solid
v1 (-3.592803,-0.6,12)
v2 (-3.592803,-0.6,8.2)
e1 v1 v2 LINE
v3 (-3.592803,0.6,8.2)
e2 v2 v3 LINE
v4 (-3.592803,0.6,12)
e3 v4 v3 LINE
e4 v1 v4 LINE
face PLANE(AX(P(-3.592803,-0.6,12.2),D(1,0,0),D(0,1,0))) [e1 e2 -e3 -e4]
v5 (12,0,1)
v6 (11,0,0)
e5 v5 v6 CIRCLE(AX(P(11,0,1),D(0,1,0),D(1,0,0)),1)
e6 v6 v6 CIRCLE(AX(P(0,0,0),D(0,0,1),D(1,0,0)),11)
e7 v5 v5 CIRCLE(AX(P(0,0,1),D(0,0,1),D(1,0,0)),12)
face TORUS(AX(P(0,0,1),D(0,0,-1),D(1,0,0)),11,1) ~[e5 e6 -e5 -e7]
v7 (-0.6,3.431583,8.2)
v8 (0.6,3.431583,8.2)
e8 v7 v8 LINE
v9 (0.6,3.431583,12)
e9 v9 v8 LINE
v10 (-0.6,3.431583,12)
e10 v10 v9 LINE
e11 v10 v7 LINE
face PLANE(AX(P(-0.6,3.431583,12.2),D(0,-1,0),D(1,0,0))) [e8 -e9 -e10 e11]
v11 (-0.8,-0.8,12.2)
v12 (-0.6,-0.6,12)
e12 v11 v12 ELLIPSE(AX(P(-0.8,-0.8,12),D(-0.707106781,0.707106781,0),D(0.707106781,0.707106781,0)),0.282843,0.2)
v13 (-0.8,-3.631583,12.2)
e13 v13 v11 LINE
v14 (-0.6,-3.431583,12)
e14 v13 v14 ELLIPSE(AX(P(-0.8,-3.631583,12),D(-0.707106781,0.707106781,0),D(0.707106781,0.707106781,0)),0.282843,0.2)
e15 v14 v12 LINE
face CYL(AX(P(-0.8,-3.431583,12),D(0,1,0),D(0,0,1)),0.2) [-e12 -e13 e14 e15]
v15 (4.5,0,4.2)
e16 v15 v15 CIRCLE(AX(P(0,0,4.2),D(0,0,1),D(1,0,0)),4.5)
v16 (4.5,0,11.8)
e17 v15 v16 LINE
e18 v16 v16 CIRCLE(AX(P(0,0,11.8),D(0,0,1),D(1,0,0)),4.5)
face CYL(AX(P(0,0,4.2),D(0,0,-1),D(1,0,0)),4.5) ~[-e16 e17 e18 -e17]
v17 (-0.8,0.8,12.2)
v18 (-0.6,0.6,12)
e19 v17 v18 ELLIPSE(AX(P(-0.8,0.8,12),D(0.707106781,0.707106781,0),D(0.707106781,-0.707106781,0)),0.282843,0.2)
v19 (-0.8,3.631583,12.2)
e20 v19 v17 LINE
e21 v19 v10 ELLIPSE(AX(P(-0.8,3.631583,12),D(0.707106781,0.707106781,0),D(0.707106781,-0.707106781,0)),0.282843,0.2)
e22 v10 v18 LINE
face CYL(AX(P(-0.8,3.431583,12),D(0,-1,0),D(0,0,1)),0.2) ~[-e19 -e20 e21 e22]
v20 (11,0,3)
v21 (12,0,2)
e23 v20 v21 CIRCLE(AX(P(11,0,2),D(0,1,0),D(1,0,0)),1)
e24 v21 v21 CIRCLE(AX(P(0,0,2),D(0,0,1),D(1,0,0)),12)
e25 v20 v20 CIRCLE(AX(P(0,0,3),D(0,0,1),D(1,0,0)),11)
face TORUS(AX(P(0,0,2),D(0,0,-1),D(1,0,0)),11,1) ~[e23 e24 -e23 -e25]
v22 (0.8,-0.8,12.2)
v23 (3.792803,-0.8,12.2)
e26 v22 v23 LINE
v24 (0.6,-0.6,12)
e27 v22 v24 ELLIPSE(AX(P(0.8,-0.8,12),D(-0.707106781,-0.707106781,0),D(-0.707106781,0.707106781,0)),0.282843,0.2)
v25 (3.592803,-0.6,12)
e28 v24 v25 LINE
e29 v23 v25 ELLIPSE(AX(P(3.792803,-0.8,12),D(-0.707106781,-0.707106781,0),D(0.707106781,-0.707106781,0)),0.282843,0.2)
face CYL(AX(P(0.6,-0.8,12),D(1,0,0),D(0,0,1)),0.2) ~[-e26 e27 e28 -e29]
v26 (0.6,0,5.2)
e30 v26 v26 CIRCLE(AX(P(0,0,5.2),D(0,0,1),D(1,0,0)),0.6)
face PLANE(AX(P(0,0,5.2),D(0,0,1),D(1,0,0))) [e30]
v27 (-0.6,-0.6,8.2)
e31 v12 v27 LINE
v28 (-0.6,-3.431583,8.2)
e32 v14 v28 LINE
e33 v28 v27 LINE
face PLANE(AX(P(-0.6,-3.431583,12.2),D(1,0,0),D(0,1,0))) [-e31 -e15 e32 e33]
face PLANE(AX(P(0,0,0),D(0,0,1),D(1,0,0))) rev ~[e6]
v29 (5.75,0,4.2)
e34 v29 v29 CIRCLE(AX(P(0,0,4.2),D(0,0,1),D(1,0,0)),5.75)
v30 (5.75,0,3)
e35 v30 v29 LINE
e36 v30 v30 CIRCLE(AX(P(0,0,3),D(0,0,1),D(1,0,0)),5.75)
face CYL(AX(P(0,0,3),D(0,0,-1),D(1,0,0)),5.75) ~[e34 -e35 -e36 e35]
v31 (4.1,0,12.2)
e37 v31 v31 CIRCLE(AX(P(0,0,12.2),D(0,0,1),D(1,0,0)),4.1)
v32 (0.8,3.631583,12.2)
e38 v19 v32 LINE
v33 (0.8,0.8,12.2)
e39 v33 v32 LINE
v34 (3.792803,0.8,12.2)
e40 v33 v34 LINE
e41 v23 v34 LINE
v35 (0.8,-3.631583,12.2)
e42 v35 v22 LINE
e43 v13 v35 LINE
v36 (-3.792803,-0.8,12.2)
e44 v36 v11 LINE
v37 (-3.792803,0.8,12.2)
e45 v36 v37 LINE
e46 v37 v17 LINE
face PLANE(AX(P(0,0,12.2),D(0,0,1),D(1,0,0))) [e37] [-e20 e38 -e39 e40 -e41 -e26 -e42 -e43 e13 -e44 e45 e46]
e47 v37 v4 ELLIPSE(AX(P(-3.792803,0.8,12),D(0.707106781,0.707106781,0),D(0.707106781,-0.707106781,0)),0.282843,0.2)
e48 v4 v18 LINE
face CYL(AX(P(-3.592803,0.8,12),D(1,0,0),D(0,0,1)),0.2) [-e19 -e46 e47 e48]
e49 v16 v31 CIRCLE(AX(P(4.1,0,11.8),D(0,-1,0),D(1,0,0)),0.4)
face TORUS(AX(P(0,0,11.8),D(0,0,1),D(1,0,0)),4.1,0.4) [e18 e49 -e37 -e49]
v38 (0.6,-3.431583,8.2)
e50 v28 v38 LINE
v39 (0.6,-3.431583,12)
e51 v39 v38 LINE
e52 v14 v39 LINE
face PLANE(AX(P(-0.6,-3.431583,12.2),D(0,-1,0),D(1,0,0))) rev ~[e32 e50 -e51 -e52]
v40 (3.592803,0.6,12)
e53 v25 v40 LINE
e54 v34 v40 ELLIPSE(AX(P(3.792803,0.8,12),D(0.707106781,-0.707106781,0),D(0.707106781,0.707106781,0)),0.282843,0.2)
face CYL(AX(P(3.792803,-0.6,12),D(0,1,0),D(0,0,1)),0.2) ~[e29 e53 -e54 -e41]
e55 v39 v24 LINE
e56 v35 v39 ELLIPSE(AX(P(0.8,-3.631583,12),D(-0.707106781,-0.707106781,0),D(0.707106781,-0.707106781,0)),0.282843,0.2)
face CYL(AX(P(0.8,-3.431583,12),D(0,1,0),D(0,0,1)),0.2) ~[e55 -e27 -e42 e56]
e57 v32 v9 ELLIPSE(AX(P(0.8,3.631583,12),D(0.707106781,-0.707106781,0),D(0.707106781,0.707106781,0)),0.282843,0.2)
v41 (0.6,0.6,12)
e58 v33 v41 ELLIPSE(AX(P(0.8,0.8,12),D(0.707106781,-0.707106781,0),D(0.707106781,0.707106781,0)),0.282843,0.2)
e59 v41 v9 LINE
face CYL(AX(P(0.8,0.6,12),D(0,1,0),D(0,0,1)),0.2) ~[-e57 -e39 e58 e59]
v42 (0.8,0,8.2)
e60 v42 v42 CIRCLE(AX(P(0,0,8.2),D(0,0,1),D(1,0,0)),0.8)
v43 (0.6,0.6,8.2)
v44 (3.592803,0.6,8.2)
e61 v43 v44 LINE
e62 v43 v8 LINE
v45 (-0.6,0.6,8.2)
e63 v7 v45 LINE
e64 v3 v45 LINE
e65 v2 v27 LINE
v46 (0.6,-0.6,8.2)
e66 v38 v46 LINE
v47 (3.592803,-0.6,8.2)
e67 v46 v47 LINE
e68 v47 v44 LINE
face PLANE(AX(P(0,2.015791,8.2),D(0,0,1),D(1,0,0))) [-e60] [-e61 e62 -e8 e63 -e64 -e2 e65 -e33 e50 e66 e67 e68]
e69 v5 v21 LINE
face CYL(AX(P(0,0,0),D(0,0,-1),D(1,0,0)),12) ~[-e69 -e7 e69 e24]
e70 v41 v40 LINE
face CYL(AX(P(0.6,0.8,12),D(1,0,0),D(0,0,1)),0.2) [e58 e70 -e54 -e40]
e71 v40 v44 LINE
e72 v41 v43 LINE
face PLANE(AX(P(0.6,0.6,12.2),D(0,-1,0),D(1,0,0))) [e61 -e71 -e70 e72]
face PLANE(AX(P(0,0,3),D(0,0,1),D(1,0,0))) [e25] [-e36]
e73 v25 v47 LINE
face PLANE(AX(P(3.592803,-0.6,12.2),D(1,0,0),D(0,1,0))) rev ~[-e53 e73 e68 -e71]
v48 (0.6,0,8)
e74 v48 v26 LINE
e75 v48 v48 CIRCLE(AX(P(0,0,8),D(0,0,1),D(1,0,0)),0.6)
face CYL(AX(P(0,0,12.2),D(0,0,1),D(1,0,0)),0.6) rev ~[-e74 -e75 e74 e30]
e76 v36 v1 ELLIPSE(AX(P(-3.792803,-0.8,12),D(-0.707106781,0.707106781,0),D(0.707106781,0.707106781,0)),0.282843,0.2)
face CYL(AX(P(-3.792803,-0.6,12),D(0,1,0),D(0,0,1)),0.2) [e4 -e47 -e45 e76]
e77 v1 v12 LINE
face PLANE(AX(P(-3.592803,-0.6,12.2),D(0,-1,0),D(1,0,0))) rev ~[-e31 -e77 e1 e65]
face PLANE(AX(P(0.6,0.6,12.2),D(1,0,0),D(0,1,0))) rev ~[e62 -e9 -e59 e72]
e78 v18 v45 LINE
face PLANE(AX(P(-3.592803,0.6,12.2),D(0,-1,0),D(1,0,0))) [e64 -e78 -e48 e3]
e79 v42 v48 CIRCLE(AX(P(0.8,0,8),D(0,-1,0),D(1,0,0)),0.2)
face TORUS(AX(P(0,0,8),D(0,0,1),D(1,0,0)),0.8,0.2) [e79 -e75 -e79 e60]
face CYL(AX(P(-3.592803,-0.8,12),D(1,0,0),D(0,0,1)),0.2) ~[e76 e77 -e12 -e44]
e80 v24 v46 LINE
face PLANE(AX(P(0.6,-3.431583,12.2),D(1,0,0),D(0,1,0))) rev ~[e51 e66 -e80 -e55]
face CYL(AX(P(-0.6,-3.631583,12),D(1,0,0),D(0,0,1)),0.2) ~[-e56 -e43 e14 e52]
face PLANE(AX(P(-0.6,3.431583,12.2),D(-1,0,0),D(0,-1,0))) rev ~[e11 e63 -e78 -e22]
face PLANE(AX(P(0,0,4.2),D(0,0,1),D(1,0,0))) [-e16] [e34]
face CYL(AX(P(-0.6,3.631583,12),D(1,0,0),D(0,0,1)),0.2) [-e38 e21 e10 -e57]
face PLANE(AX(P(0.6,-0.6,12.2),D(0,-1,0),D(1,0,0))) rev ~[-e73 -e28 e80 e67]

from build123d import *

# Parameters (mm, degrees)
F0_R      = 12
F1_DEPTH  = 3
F2_R      = 5.75
F3_DEPTH  = 1.2
F4_R      = 4.5
F5_DEPTH  = 8
F6_R      = 0.6
F10_DEPTH = 7
F11_W     = 1.2
F11_H     = 2.8315826069
F11_H_2   = 1.2
F11_W_2   = 2.9928033758
F12_DEPTH = 4
F13_R     = 0.4
F14_R     = 1
F15_R     = 0.2


# Not quite as in the source:
# - a feature of the source that left no trace in its solid (it failed there, or was rolled back) is left out


with BuildPart() as f1:
    # F0 (on Top) → F1 (new body)
    with BuildSketch(Plane.XY):
        Circle(F0_R)
    extrude(amount=F1_DEPTH)

    # F2 (on face) → F3 (join)
    with BuildSketch(Plane.XY.offset(3)):
        Circle(F2_R)
    extrude(amount=F3_DEPTH)

    # F4 (on face) → F5 (join)
    with BuildSketch(Plane.XY.offset(4.2)):
        Circle(F4_R)
    extrude(amount=F5_DEPTH)

    # F6 (on face) → F10 (cut)
    with BuildSketch(Plane.XY.offset(12.2)):
        Circle(F6_R)
    extrude(amount=-F10_DEPTH, mode=Mode.SUBTRACT)

    # F11 (on face) → F12 (cut)
    with BuildSketch(Plane.XY.offset(12.2)):
        with Locations((0, 2.0157913034)):
            Rectangle(F11_W, F11_H)
        Rectangle(F11_W, F11_H_2)
        with Locations((-2.0964016879, 0)):
            Rectangle(F11_W_2, F11_H_2)
        with Locations((2.0964016879, 0)):
            Rectangle(F11_W_2, F11_H_2)
        with Locations((0, -2.0157913034)):
            Rectangle(F11_W, F11_H)
    extrude(amount=-F12_DEPTH, mode=Mode.SUBTRACT)

    # F13
    f13_edges = [f1.edges().sort_by_distance(p)[0] for p in [
        (-4.5, 0, 12.2),
    ]]
    fillet(f13_edges, radius=F13_R)

    # F14
    f14_edges = [f1.edges().sort_by_distance(p)[0] for p in [
        (-12, 0, 3),
        (-12, 0, 0),
    ]]
    fillet(f14_edges, radius=F14_R)

    # F15
    f15_edges = [f1.edges().sort_by_distance(p)[0] for p in [
        (-4.1, 0, 12.2),
        (0, 3.431583, 12.2),
        (-0.6, 2.015791, 12.2),
        (-2.096402, 0.6, 12.2),
        (-3.592803, 0, 12.2),
        (-2.096402, -0.6, 12.2),
        (-0.6, -2.015791, 12.2),
        (0, -3.431583, 12.2),
        (0.6, -2.015791, 12.2),
        (2.096402, -0.6, 12.2),
        (3.592803, 0, 12.2),
        (2.096402, 0.6, 12.2),
        (0.6, 2.015791, 12.2),
        (-0.6, 0, 8.2),
    ]]
    fillet(f15_edges, radius=F15_R)


solid = f1.part
